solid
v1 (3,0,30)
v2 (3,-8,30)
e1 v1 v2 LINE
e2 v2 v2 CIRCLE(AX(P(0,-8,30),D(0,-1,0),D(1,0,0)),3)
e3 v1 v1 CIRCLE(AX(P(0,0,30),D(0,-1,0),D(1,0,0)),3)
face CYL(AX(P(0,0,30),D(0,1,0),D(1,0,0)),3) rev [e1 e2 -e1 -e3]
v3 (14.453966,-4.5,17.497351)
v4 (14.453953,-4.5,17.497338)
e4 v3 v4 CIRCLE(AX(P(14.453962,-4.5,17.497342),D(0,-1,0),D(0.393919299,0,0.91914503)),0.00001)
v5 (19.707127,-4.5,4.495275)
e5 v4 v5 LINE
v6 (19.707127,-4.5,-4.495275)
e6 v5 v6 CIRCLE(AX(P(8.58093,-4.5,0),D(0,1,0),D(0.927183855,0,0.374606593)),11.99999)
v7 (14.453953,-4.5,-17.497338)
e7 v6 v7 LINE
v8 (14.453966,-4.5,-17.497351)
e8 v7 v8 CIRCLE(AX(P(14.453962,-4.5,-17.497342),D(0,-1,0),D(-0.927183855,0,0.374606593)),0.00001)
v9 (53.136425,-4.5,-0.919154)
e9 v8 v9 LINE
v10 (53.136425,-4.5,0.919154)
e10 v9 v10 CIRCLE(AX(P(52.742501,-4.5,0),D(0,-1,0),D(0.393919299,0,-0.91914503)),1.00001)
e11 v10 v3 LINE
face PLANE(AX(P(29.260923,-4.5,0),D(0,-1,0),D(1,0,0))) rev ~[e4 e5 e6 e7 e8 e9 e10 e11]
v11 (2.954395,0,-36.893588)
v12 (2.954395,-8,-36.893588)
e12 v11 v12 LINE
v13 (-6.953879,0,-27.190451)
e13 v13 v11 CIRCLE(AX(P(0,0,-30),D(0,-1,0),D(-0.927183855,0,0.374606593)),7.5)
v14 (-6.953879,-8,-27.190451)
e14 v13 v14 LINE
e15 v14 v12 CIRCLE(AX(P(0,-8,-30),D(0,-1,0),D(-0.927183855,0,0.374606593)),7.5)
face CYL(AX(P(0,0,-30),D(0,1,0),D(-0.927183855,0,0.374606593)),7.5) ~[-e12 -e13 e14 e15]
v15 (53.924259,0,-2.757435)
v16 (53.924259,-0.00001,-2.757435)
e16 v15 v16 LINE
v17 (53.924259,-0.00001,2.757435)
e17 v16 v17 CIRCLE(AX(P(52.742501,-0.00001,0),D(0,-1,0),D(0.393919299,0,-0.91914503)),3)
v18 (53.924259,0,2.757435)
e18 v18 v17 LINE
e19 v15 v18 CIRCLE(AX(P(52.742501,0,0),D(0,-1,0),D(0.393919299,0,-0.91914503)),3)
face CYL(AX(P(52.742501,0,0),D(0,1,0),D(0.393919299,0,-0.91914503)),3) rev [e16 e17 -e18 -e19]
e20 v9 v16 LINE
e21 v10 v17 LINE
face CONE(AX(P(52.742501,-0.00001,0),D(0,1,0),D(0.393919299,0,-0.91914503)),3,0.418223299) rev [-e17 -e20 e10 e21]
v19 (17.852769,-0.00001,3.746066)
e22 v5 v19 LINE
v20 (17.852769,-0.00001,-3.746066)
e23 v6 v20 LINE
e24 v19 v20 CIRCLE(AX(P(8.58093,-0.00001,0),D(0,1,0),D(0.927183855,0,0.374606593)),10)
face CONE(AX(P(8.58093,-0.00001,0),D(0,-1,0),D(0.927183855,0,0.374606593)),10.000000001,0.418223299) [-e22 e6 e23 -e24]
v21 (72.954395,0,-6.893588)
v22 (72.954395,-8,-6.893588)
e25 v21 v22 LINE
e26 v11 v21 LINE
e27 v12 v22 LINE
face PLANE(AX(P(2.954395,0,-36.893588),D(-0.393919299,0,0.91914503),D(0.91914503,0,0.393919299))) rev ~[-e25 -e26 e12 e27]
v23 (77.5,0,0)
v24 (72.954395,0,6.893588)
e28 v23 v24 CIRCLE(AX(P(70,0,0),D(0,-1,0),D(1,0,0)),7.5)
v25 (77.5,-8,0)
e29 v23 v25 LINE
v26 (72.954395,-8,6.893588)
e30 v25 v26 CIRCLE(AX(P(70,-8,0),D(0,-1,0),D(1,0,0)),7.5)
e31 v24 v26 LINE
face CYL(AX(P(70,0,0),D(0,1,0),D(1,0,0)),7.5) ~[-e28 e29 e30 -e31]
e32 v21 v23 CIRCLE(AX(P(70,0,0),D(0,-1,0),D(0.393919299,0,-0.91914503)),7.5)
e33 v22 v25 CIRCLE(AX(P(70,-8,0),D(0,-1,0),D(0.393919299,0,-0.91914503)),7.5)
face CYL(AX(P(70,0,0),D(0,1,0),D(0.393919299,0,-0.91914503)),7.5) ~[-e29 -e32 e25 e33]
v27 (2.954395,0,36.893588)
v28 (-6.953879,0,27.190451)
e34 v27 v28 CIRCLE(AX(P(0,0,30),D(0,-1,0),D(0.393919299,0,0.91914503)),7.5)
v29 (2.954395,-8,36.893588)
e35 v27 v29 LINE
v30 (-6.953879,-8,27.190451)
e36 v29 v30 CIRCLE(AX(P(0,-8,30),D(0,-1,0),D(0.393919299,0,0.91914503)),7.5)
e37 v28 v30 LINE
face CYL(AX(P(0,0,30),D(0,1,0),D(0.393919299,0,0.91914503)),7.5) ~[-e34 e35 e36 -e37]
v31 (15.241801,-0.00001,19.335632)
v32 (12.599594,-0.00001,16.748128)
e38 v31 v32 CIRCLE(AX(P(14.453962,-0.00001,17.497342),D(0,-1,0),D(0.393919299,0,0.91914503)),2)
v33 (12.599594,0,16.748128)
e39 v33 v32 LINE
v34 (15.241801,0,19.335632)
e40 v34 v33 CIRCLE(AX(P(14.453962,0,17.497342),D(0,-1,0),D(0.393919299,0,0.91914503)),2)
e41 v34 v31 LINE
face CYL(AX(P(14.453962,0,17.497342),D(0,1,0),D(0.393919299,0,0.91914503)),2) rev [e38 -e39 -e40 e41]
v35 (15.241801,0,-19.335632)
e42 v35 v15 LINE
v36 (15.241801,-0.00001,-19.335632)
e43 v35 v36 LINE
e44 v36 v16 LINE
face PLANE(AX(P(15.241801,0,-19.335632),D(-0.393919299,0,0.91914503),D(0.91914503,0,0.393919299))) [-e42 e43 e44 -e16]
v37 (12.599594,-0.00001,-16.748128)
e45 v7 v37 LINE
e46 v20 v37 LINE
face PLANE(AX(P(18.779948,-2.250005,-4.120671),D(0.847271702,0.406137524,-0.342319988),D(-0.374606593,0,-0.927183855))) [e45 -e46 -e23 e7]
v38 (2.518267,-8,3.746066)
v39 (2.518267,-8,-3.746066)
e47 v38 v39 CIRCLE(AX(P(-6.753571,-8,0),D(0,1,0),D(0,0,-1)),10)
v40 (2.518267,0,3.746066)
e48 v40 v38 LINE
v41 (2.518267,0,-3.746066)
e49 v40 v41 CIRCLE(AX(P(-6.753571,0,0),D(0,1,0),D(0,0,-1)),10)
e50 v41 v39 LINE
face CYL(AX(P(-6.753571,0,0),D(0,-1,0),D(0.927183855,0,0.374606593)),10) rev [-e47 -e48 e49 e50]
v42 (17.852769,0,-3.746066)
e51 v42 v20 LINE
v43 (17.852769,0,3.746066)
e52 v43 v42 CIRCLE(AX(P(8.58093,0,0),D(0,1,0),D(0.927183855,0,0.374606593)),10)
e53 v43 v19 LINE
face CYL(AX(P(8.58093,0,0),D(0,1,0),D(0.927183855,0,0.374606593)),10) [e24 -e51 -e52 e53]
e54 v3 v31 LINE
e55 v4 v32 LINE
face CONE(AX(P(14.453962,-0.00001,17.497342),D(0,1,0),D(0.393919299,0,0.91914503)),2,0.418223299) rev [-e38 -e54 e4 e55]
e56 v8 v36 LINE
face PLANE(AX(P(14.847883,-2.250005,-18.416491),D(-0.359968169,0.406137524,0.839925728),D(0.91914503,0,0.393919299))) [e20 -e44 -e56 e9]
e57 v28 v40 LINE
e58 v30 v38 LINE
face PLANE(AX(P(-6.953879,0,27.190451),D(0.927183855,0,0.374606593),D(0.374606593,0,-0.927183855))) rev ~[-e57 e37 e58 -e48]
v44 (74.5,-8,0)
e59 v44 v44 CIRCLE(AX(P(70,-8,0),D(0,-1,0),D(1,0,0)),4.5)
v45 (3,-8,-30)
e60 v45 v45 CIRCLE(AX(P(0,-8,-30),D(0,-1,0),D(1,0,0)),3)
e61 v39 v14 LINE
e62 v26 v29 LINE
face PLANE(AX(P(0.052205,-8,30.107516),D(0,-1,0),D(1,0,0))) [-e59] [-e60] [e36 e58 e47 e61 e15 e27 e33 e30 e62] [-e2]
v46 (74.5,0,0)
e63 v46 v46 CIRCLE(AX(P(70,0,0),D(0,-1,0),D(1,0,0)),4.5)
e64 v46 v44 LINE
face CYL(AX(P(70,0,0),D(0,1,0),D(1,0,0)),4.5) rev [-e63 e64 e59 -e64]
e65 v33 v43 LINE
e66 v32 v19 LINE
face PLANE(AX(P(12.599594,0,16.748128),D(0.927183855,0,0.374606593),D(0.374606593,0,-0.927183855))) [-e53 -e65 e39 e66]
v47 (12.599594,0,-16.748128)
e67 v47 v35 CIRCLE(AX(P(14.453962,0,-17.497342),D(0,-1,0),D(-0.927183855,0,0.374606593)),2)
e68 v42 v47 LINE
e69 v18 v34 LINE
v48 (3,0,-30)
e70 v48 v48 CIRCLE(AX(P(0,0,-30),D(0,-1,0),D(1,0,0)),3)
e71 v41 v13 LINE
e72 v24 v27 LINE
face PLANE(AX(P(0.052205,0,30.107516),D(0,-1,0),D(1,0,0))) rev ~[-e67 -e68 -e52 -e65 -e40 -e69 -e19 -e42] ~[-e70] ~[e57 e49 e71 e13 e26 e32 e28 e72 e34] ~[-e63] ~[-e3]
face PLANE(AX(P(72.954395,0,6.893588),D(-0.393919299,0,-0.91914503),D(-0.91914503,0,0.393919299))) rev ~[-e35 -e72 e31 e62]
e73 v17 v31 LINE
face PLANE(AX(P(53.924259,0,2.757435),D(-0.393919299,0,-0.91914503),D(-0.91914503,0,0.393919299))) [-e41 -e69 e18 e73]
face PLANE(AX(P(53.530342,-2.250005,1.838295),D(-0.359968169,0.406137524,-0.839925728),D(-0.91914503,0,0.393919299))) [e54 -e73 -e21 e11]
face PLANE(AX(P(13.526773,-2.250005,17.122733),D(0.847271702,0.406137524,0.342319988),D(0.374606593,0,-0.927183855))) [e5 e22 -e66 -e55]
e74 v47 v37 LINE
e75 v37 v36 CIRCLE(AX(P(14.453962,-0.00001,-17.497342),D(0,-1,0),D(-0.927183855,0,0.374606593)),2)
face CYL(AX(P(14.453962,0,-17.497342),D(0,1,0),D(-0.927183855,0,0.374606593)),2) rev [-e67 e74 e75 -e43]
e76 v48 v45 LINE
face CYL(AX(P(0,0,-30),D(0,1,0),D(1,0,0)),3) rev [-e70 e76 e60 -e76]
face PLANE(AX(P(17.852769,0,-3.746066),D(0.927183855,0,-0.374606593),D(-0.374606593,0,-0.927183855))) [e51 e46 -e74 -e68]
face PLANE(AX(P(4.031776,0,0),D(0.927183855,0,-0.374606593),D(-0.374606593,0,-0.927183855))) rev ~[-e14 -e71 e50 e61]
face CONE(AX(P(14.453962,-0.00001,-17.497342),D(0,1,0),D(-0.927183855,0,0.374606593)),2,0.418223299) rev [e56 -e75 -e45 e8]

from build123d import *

# Parameters (mm, degrees)
F0_R     = 3
F0_R_2   = 4.5
F1_DEPTH = 8
F2_R     = 10
F4_DEPTH = 4.5
F5_SIZE2 = 4.49999
F5_SIZE  = 1.99999


# Not quite as in the source:
# - a fillet or chamfer is up to 0.001 mm smaller than in the source, because OpenCascade refuses the exact size


with BuildPart() as f1:
    # F0 (on Front) → F1 (new body)
    with BuildSketch(Plane.XZ):
        with BuildLine():
            ThreePointArc((-6.9538789093, 27.1904505494), (1.4310674653, 22.6377961241), (7.5, 30))
            ThreePointArc((7.5, 30), (6.2613081918, 34.1286825656), (2.9543947393, 36.8935877251))
            ThreePointArc((2.9543947393, 36.8935877251), (-5.247540964, 35.3584805524), (-6.9538789093, 27.1904505494))
        make_face()
        with Locations((0, 30)):
            Circle(F0_R, mode=Mode.SUBTRACT)
        with BuildLine():
            ThreePointArc((2.9543947393, 36.8935877251), (6.2613081918, 34.1286825656), (7.5, 30))
            ThreePointArc((7.5, 30), (1.4310674653, 22.6377961241), (-6.9538789093, 27.1904505494))
            Line((-6.9538789093, 27.1904505494), (4.031776205, 0))
            Line((4.031776205, 0), (-6.9538789093, -27.1904505494))
            ThreePointArc((-6.9538789093, -27.1904505494), (1.4310674653, -22.6377961241), (7.5, -30))
            ThreePointArc((7.5, -30), (6.2613081918, -34.1286825656), (2.9543947393, -36.8935877251))
            Line((2.9543947393, -36.8935877251), (72.9543947393, -6.8935877251))
            ThreePointArc((72.9543947393, -6.8935877251), (62.5, 0), (72.9543947393, 6.8935877251))
            Line((72.9543947393, 6.8935877251), (2.9543947393, 36.8935877251))
        make_face()
        with BuildLine():
            ThreePointArc((77.5, 0), (76.2613081918, 4.1286825656), (72.9543947393, 6.8935877251))
            ThreePointArc((72.9543947393, 6.8935877251), (62.5, 0), (72.9543947393, -6.8935877251))
            ThreePointArc((72.9543947393, -6.8935877251), (76.2613081918, -4.1286825656), (77.5, 0))
        make_face()
        with Locations((70, 0)):
            Circle(F0_R_2, mode=Mode.SUBTRACT)
        with BuildLine():
            ThreePointArc((7.5, -30), (1.4310674653, -22.6377961241), (-6.9538789093, -27.1904505494))
            ThreePointArc((-6.9538789093, -27.1904505494), (-5.247540964, -35.3584805524), (2.9543947393, -36.8935877251))
            ThreePointArc((2.9543947393, -36.8935877251), (6.2613081918, -34.1286825656), (7.5, -30))
        make_face()
        with Locations((0, -30)):
            Circle(F0_R, mode=Mode.SUBTRACT)
    extrude(amount=F1_DEPTH)

    # F2
    f2_edges = [f1.edges().sort_by_distance(p)[0] for p in [
        (4.031776, -4, 0),
    ]]
    fillet(f2_edges, radius=F2_R)

    # F3 (on Front) → F4 (cut)
    with BuildSketch(Plane.XZ):
        with BuildLine():
            Line((12.5995942419, 16.7481284808), (17.8527685007, 3.7460659342))
            ThreePointArc((17.8527685007, 3.7460659342), (18.580929955, 0), (17.8527685007, -3.7460659342))
            Line((17.8527685007, -3.7460659342), (12.5995942419, -16.7481284808))
            ThreePointArc((12.5995942419, -16.7481284808), (13.0546176939, -18.926269815), (15.2418005482, -19.3356317277))
            Line((15.2418005482, -19.3356317277), (53.9242593693, -2.7574350901))
            ThreePointArc((53.9242593693, -2.7574350901), (55.7425014736, 0), (53.9242593693, 2.7574350901))
            Line((53.9242593693, 2.7574350901), (15.2418005482, 19.3356317277))
            ThreePointArc((15.2418005482, 19.3356317277), (13.0546176939, 18.926269815), (12.5995942419, 16.7481284808))
        make_face()
    extrude(amount=F4_DEPTH, mode=Mode.SUBTRACT)

    # F5 (size 2 and 4.5 in the source; OpenCascade refuses exactly that, so slightly less here)
    f5_edges = [f1.edges().sort_by_distance(p)[0] for p in [
        (34.58303, -4.5, 11.046533),
    ]]
    f5_side = f1.faces().sort_by_distance((30.018515, -4.5, 0))[0]
    chamfer(f5_edges, length=F5_SIZE, length2=F5_SIZE2, reference=f5_side)


solid = f1.part
